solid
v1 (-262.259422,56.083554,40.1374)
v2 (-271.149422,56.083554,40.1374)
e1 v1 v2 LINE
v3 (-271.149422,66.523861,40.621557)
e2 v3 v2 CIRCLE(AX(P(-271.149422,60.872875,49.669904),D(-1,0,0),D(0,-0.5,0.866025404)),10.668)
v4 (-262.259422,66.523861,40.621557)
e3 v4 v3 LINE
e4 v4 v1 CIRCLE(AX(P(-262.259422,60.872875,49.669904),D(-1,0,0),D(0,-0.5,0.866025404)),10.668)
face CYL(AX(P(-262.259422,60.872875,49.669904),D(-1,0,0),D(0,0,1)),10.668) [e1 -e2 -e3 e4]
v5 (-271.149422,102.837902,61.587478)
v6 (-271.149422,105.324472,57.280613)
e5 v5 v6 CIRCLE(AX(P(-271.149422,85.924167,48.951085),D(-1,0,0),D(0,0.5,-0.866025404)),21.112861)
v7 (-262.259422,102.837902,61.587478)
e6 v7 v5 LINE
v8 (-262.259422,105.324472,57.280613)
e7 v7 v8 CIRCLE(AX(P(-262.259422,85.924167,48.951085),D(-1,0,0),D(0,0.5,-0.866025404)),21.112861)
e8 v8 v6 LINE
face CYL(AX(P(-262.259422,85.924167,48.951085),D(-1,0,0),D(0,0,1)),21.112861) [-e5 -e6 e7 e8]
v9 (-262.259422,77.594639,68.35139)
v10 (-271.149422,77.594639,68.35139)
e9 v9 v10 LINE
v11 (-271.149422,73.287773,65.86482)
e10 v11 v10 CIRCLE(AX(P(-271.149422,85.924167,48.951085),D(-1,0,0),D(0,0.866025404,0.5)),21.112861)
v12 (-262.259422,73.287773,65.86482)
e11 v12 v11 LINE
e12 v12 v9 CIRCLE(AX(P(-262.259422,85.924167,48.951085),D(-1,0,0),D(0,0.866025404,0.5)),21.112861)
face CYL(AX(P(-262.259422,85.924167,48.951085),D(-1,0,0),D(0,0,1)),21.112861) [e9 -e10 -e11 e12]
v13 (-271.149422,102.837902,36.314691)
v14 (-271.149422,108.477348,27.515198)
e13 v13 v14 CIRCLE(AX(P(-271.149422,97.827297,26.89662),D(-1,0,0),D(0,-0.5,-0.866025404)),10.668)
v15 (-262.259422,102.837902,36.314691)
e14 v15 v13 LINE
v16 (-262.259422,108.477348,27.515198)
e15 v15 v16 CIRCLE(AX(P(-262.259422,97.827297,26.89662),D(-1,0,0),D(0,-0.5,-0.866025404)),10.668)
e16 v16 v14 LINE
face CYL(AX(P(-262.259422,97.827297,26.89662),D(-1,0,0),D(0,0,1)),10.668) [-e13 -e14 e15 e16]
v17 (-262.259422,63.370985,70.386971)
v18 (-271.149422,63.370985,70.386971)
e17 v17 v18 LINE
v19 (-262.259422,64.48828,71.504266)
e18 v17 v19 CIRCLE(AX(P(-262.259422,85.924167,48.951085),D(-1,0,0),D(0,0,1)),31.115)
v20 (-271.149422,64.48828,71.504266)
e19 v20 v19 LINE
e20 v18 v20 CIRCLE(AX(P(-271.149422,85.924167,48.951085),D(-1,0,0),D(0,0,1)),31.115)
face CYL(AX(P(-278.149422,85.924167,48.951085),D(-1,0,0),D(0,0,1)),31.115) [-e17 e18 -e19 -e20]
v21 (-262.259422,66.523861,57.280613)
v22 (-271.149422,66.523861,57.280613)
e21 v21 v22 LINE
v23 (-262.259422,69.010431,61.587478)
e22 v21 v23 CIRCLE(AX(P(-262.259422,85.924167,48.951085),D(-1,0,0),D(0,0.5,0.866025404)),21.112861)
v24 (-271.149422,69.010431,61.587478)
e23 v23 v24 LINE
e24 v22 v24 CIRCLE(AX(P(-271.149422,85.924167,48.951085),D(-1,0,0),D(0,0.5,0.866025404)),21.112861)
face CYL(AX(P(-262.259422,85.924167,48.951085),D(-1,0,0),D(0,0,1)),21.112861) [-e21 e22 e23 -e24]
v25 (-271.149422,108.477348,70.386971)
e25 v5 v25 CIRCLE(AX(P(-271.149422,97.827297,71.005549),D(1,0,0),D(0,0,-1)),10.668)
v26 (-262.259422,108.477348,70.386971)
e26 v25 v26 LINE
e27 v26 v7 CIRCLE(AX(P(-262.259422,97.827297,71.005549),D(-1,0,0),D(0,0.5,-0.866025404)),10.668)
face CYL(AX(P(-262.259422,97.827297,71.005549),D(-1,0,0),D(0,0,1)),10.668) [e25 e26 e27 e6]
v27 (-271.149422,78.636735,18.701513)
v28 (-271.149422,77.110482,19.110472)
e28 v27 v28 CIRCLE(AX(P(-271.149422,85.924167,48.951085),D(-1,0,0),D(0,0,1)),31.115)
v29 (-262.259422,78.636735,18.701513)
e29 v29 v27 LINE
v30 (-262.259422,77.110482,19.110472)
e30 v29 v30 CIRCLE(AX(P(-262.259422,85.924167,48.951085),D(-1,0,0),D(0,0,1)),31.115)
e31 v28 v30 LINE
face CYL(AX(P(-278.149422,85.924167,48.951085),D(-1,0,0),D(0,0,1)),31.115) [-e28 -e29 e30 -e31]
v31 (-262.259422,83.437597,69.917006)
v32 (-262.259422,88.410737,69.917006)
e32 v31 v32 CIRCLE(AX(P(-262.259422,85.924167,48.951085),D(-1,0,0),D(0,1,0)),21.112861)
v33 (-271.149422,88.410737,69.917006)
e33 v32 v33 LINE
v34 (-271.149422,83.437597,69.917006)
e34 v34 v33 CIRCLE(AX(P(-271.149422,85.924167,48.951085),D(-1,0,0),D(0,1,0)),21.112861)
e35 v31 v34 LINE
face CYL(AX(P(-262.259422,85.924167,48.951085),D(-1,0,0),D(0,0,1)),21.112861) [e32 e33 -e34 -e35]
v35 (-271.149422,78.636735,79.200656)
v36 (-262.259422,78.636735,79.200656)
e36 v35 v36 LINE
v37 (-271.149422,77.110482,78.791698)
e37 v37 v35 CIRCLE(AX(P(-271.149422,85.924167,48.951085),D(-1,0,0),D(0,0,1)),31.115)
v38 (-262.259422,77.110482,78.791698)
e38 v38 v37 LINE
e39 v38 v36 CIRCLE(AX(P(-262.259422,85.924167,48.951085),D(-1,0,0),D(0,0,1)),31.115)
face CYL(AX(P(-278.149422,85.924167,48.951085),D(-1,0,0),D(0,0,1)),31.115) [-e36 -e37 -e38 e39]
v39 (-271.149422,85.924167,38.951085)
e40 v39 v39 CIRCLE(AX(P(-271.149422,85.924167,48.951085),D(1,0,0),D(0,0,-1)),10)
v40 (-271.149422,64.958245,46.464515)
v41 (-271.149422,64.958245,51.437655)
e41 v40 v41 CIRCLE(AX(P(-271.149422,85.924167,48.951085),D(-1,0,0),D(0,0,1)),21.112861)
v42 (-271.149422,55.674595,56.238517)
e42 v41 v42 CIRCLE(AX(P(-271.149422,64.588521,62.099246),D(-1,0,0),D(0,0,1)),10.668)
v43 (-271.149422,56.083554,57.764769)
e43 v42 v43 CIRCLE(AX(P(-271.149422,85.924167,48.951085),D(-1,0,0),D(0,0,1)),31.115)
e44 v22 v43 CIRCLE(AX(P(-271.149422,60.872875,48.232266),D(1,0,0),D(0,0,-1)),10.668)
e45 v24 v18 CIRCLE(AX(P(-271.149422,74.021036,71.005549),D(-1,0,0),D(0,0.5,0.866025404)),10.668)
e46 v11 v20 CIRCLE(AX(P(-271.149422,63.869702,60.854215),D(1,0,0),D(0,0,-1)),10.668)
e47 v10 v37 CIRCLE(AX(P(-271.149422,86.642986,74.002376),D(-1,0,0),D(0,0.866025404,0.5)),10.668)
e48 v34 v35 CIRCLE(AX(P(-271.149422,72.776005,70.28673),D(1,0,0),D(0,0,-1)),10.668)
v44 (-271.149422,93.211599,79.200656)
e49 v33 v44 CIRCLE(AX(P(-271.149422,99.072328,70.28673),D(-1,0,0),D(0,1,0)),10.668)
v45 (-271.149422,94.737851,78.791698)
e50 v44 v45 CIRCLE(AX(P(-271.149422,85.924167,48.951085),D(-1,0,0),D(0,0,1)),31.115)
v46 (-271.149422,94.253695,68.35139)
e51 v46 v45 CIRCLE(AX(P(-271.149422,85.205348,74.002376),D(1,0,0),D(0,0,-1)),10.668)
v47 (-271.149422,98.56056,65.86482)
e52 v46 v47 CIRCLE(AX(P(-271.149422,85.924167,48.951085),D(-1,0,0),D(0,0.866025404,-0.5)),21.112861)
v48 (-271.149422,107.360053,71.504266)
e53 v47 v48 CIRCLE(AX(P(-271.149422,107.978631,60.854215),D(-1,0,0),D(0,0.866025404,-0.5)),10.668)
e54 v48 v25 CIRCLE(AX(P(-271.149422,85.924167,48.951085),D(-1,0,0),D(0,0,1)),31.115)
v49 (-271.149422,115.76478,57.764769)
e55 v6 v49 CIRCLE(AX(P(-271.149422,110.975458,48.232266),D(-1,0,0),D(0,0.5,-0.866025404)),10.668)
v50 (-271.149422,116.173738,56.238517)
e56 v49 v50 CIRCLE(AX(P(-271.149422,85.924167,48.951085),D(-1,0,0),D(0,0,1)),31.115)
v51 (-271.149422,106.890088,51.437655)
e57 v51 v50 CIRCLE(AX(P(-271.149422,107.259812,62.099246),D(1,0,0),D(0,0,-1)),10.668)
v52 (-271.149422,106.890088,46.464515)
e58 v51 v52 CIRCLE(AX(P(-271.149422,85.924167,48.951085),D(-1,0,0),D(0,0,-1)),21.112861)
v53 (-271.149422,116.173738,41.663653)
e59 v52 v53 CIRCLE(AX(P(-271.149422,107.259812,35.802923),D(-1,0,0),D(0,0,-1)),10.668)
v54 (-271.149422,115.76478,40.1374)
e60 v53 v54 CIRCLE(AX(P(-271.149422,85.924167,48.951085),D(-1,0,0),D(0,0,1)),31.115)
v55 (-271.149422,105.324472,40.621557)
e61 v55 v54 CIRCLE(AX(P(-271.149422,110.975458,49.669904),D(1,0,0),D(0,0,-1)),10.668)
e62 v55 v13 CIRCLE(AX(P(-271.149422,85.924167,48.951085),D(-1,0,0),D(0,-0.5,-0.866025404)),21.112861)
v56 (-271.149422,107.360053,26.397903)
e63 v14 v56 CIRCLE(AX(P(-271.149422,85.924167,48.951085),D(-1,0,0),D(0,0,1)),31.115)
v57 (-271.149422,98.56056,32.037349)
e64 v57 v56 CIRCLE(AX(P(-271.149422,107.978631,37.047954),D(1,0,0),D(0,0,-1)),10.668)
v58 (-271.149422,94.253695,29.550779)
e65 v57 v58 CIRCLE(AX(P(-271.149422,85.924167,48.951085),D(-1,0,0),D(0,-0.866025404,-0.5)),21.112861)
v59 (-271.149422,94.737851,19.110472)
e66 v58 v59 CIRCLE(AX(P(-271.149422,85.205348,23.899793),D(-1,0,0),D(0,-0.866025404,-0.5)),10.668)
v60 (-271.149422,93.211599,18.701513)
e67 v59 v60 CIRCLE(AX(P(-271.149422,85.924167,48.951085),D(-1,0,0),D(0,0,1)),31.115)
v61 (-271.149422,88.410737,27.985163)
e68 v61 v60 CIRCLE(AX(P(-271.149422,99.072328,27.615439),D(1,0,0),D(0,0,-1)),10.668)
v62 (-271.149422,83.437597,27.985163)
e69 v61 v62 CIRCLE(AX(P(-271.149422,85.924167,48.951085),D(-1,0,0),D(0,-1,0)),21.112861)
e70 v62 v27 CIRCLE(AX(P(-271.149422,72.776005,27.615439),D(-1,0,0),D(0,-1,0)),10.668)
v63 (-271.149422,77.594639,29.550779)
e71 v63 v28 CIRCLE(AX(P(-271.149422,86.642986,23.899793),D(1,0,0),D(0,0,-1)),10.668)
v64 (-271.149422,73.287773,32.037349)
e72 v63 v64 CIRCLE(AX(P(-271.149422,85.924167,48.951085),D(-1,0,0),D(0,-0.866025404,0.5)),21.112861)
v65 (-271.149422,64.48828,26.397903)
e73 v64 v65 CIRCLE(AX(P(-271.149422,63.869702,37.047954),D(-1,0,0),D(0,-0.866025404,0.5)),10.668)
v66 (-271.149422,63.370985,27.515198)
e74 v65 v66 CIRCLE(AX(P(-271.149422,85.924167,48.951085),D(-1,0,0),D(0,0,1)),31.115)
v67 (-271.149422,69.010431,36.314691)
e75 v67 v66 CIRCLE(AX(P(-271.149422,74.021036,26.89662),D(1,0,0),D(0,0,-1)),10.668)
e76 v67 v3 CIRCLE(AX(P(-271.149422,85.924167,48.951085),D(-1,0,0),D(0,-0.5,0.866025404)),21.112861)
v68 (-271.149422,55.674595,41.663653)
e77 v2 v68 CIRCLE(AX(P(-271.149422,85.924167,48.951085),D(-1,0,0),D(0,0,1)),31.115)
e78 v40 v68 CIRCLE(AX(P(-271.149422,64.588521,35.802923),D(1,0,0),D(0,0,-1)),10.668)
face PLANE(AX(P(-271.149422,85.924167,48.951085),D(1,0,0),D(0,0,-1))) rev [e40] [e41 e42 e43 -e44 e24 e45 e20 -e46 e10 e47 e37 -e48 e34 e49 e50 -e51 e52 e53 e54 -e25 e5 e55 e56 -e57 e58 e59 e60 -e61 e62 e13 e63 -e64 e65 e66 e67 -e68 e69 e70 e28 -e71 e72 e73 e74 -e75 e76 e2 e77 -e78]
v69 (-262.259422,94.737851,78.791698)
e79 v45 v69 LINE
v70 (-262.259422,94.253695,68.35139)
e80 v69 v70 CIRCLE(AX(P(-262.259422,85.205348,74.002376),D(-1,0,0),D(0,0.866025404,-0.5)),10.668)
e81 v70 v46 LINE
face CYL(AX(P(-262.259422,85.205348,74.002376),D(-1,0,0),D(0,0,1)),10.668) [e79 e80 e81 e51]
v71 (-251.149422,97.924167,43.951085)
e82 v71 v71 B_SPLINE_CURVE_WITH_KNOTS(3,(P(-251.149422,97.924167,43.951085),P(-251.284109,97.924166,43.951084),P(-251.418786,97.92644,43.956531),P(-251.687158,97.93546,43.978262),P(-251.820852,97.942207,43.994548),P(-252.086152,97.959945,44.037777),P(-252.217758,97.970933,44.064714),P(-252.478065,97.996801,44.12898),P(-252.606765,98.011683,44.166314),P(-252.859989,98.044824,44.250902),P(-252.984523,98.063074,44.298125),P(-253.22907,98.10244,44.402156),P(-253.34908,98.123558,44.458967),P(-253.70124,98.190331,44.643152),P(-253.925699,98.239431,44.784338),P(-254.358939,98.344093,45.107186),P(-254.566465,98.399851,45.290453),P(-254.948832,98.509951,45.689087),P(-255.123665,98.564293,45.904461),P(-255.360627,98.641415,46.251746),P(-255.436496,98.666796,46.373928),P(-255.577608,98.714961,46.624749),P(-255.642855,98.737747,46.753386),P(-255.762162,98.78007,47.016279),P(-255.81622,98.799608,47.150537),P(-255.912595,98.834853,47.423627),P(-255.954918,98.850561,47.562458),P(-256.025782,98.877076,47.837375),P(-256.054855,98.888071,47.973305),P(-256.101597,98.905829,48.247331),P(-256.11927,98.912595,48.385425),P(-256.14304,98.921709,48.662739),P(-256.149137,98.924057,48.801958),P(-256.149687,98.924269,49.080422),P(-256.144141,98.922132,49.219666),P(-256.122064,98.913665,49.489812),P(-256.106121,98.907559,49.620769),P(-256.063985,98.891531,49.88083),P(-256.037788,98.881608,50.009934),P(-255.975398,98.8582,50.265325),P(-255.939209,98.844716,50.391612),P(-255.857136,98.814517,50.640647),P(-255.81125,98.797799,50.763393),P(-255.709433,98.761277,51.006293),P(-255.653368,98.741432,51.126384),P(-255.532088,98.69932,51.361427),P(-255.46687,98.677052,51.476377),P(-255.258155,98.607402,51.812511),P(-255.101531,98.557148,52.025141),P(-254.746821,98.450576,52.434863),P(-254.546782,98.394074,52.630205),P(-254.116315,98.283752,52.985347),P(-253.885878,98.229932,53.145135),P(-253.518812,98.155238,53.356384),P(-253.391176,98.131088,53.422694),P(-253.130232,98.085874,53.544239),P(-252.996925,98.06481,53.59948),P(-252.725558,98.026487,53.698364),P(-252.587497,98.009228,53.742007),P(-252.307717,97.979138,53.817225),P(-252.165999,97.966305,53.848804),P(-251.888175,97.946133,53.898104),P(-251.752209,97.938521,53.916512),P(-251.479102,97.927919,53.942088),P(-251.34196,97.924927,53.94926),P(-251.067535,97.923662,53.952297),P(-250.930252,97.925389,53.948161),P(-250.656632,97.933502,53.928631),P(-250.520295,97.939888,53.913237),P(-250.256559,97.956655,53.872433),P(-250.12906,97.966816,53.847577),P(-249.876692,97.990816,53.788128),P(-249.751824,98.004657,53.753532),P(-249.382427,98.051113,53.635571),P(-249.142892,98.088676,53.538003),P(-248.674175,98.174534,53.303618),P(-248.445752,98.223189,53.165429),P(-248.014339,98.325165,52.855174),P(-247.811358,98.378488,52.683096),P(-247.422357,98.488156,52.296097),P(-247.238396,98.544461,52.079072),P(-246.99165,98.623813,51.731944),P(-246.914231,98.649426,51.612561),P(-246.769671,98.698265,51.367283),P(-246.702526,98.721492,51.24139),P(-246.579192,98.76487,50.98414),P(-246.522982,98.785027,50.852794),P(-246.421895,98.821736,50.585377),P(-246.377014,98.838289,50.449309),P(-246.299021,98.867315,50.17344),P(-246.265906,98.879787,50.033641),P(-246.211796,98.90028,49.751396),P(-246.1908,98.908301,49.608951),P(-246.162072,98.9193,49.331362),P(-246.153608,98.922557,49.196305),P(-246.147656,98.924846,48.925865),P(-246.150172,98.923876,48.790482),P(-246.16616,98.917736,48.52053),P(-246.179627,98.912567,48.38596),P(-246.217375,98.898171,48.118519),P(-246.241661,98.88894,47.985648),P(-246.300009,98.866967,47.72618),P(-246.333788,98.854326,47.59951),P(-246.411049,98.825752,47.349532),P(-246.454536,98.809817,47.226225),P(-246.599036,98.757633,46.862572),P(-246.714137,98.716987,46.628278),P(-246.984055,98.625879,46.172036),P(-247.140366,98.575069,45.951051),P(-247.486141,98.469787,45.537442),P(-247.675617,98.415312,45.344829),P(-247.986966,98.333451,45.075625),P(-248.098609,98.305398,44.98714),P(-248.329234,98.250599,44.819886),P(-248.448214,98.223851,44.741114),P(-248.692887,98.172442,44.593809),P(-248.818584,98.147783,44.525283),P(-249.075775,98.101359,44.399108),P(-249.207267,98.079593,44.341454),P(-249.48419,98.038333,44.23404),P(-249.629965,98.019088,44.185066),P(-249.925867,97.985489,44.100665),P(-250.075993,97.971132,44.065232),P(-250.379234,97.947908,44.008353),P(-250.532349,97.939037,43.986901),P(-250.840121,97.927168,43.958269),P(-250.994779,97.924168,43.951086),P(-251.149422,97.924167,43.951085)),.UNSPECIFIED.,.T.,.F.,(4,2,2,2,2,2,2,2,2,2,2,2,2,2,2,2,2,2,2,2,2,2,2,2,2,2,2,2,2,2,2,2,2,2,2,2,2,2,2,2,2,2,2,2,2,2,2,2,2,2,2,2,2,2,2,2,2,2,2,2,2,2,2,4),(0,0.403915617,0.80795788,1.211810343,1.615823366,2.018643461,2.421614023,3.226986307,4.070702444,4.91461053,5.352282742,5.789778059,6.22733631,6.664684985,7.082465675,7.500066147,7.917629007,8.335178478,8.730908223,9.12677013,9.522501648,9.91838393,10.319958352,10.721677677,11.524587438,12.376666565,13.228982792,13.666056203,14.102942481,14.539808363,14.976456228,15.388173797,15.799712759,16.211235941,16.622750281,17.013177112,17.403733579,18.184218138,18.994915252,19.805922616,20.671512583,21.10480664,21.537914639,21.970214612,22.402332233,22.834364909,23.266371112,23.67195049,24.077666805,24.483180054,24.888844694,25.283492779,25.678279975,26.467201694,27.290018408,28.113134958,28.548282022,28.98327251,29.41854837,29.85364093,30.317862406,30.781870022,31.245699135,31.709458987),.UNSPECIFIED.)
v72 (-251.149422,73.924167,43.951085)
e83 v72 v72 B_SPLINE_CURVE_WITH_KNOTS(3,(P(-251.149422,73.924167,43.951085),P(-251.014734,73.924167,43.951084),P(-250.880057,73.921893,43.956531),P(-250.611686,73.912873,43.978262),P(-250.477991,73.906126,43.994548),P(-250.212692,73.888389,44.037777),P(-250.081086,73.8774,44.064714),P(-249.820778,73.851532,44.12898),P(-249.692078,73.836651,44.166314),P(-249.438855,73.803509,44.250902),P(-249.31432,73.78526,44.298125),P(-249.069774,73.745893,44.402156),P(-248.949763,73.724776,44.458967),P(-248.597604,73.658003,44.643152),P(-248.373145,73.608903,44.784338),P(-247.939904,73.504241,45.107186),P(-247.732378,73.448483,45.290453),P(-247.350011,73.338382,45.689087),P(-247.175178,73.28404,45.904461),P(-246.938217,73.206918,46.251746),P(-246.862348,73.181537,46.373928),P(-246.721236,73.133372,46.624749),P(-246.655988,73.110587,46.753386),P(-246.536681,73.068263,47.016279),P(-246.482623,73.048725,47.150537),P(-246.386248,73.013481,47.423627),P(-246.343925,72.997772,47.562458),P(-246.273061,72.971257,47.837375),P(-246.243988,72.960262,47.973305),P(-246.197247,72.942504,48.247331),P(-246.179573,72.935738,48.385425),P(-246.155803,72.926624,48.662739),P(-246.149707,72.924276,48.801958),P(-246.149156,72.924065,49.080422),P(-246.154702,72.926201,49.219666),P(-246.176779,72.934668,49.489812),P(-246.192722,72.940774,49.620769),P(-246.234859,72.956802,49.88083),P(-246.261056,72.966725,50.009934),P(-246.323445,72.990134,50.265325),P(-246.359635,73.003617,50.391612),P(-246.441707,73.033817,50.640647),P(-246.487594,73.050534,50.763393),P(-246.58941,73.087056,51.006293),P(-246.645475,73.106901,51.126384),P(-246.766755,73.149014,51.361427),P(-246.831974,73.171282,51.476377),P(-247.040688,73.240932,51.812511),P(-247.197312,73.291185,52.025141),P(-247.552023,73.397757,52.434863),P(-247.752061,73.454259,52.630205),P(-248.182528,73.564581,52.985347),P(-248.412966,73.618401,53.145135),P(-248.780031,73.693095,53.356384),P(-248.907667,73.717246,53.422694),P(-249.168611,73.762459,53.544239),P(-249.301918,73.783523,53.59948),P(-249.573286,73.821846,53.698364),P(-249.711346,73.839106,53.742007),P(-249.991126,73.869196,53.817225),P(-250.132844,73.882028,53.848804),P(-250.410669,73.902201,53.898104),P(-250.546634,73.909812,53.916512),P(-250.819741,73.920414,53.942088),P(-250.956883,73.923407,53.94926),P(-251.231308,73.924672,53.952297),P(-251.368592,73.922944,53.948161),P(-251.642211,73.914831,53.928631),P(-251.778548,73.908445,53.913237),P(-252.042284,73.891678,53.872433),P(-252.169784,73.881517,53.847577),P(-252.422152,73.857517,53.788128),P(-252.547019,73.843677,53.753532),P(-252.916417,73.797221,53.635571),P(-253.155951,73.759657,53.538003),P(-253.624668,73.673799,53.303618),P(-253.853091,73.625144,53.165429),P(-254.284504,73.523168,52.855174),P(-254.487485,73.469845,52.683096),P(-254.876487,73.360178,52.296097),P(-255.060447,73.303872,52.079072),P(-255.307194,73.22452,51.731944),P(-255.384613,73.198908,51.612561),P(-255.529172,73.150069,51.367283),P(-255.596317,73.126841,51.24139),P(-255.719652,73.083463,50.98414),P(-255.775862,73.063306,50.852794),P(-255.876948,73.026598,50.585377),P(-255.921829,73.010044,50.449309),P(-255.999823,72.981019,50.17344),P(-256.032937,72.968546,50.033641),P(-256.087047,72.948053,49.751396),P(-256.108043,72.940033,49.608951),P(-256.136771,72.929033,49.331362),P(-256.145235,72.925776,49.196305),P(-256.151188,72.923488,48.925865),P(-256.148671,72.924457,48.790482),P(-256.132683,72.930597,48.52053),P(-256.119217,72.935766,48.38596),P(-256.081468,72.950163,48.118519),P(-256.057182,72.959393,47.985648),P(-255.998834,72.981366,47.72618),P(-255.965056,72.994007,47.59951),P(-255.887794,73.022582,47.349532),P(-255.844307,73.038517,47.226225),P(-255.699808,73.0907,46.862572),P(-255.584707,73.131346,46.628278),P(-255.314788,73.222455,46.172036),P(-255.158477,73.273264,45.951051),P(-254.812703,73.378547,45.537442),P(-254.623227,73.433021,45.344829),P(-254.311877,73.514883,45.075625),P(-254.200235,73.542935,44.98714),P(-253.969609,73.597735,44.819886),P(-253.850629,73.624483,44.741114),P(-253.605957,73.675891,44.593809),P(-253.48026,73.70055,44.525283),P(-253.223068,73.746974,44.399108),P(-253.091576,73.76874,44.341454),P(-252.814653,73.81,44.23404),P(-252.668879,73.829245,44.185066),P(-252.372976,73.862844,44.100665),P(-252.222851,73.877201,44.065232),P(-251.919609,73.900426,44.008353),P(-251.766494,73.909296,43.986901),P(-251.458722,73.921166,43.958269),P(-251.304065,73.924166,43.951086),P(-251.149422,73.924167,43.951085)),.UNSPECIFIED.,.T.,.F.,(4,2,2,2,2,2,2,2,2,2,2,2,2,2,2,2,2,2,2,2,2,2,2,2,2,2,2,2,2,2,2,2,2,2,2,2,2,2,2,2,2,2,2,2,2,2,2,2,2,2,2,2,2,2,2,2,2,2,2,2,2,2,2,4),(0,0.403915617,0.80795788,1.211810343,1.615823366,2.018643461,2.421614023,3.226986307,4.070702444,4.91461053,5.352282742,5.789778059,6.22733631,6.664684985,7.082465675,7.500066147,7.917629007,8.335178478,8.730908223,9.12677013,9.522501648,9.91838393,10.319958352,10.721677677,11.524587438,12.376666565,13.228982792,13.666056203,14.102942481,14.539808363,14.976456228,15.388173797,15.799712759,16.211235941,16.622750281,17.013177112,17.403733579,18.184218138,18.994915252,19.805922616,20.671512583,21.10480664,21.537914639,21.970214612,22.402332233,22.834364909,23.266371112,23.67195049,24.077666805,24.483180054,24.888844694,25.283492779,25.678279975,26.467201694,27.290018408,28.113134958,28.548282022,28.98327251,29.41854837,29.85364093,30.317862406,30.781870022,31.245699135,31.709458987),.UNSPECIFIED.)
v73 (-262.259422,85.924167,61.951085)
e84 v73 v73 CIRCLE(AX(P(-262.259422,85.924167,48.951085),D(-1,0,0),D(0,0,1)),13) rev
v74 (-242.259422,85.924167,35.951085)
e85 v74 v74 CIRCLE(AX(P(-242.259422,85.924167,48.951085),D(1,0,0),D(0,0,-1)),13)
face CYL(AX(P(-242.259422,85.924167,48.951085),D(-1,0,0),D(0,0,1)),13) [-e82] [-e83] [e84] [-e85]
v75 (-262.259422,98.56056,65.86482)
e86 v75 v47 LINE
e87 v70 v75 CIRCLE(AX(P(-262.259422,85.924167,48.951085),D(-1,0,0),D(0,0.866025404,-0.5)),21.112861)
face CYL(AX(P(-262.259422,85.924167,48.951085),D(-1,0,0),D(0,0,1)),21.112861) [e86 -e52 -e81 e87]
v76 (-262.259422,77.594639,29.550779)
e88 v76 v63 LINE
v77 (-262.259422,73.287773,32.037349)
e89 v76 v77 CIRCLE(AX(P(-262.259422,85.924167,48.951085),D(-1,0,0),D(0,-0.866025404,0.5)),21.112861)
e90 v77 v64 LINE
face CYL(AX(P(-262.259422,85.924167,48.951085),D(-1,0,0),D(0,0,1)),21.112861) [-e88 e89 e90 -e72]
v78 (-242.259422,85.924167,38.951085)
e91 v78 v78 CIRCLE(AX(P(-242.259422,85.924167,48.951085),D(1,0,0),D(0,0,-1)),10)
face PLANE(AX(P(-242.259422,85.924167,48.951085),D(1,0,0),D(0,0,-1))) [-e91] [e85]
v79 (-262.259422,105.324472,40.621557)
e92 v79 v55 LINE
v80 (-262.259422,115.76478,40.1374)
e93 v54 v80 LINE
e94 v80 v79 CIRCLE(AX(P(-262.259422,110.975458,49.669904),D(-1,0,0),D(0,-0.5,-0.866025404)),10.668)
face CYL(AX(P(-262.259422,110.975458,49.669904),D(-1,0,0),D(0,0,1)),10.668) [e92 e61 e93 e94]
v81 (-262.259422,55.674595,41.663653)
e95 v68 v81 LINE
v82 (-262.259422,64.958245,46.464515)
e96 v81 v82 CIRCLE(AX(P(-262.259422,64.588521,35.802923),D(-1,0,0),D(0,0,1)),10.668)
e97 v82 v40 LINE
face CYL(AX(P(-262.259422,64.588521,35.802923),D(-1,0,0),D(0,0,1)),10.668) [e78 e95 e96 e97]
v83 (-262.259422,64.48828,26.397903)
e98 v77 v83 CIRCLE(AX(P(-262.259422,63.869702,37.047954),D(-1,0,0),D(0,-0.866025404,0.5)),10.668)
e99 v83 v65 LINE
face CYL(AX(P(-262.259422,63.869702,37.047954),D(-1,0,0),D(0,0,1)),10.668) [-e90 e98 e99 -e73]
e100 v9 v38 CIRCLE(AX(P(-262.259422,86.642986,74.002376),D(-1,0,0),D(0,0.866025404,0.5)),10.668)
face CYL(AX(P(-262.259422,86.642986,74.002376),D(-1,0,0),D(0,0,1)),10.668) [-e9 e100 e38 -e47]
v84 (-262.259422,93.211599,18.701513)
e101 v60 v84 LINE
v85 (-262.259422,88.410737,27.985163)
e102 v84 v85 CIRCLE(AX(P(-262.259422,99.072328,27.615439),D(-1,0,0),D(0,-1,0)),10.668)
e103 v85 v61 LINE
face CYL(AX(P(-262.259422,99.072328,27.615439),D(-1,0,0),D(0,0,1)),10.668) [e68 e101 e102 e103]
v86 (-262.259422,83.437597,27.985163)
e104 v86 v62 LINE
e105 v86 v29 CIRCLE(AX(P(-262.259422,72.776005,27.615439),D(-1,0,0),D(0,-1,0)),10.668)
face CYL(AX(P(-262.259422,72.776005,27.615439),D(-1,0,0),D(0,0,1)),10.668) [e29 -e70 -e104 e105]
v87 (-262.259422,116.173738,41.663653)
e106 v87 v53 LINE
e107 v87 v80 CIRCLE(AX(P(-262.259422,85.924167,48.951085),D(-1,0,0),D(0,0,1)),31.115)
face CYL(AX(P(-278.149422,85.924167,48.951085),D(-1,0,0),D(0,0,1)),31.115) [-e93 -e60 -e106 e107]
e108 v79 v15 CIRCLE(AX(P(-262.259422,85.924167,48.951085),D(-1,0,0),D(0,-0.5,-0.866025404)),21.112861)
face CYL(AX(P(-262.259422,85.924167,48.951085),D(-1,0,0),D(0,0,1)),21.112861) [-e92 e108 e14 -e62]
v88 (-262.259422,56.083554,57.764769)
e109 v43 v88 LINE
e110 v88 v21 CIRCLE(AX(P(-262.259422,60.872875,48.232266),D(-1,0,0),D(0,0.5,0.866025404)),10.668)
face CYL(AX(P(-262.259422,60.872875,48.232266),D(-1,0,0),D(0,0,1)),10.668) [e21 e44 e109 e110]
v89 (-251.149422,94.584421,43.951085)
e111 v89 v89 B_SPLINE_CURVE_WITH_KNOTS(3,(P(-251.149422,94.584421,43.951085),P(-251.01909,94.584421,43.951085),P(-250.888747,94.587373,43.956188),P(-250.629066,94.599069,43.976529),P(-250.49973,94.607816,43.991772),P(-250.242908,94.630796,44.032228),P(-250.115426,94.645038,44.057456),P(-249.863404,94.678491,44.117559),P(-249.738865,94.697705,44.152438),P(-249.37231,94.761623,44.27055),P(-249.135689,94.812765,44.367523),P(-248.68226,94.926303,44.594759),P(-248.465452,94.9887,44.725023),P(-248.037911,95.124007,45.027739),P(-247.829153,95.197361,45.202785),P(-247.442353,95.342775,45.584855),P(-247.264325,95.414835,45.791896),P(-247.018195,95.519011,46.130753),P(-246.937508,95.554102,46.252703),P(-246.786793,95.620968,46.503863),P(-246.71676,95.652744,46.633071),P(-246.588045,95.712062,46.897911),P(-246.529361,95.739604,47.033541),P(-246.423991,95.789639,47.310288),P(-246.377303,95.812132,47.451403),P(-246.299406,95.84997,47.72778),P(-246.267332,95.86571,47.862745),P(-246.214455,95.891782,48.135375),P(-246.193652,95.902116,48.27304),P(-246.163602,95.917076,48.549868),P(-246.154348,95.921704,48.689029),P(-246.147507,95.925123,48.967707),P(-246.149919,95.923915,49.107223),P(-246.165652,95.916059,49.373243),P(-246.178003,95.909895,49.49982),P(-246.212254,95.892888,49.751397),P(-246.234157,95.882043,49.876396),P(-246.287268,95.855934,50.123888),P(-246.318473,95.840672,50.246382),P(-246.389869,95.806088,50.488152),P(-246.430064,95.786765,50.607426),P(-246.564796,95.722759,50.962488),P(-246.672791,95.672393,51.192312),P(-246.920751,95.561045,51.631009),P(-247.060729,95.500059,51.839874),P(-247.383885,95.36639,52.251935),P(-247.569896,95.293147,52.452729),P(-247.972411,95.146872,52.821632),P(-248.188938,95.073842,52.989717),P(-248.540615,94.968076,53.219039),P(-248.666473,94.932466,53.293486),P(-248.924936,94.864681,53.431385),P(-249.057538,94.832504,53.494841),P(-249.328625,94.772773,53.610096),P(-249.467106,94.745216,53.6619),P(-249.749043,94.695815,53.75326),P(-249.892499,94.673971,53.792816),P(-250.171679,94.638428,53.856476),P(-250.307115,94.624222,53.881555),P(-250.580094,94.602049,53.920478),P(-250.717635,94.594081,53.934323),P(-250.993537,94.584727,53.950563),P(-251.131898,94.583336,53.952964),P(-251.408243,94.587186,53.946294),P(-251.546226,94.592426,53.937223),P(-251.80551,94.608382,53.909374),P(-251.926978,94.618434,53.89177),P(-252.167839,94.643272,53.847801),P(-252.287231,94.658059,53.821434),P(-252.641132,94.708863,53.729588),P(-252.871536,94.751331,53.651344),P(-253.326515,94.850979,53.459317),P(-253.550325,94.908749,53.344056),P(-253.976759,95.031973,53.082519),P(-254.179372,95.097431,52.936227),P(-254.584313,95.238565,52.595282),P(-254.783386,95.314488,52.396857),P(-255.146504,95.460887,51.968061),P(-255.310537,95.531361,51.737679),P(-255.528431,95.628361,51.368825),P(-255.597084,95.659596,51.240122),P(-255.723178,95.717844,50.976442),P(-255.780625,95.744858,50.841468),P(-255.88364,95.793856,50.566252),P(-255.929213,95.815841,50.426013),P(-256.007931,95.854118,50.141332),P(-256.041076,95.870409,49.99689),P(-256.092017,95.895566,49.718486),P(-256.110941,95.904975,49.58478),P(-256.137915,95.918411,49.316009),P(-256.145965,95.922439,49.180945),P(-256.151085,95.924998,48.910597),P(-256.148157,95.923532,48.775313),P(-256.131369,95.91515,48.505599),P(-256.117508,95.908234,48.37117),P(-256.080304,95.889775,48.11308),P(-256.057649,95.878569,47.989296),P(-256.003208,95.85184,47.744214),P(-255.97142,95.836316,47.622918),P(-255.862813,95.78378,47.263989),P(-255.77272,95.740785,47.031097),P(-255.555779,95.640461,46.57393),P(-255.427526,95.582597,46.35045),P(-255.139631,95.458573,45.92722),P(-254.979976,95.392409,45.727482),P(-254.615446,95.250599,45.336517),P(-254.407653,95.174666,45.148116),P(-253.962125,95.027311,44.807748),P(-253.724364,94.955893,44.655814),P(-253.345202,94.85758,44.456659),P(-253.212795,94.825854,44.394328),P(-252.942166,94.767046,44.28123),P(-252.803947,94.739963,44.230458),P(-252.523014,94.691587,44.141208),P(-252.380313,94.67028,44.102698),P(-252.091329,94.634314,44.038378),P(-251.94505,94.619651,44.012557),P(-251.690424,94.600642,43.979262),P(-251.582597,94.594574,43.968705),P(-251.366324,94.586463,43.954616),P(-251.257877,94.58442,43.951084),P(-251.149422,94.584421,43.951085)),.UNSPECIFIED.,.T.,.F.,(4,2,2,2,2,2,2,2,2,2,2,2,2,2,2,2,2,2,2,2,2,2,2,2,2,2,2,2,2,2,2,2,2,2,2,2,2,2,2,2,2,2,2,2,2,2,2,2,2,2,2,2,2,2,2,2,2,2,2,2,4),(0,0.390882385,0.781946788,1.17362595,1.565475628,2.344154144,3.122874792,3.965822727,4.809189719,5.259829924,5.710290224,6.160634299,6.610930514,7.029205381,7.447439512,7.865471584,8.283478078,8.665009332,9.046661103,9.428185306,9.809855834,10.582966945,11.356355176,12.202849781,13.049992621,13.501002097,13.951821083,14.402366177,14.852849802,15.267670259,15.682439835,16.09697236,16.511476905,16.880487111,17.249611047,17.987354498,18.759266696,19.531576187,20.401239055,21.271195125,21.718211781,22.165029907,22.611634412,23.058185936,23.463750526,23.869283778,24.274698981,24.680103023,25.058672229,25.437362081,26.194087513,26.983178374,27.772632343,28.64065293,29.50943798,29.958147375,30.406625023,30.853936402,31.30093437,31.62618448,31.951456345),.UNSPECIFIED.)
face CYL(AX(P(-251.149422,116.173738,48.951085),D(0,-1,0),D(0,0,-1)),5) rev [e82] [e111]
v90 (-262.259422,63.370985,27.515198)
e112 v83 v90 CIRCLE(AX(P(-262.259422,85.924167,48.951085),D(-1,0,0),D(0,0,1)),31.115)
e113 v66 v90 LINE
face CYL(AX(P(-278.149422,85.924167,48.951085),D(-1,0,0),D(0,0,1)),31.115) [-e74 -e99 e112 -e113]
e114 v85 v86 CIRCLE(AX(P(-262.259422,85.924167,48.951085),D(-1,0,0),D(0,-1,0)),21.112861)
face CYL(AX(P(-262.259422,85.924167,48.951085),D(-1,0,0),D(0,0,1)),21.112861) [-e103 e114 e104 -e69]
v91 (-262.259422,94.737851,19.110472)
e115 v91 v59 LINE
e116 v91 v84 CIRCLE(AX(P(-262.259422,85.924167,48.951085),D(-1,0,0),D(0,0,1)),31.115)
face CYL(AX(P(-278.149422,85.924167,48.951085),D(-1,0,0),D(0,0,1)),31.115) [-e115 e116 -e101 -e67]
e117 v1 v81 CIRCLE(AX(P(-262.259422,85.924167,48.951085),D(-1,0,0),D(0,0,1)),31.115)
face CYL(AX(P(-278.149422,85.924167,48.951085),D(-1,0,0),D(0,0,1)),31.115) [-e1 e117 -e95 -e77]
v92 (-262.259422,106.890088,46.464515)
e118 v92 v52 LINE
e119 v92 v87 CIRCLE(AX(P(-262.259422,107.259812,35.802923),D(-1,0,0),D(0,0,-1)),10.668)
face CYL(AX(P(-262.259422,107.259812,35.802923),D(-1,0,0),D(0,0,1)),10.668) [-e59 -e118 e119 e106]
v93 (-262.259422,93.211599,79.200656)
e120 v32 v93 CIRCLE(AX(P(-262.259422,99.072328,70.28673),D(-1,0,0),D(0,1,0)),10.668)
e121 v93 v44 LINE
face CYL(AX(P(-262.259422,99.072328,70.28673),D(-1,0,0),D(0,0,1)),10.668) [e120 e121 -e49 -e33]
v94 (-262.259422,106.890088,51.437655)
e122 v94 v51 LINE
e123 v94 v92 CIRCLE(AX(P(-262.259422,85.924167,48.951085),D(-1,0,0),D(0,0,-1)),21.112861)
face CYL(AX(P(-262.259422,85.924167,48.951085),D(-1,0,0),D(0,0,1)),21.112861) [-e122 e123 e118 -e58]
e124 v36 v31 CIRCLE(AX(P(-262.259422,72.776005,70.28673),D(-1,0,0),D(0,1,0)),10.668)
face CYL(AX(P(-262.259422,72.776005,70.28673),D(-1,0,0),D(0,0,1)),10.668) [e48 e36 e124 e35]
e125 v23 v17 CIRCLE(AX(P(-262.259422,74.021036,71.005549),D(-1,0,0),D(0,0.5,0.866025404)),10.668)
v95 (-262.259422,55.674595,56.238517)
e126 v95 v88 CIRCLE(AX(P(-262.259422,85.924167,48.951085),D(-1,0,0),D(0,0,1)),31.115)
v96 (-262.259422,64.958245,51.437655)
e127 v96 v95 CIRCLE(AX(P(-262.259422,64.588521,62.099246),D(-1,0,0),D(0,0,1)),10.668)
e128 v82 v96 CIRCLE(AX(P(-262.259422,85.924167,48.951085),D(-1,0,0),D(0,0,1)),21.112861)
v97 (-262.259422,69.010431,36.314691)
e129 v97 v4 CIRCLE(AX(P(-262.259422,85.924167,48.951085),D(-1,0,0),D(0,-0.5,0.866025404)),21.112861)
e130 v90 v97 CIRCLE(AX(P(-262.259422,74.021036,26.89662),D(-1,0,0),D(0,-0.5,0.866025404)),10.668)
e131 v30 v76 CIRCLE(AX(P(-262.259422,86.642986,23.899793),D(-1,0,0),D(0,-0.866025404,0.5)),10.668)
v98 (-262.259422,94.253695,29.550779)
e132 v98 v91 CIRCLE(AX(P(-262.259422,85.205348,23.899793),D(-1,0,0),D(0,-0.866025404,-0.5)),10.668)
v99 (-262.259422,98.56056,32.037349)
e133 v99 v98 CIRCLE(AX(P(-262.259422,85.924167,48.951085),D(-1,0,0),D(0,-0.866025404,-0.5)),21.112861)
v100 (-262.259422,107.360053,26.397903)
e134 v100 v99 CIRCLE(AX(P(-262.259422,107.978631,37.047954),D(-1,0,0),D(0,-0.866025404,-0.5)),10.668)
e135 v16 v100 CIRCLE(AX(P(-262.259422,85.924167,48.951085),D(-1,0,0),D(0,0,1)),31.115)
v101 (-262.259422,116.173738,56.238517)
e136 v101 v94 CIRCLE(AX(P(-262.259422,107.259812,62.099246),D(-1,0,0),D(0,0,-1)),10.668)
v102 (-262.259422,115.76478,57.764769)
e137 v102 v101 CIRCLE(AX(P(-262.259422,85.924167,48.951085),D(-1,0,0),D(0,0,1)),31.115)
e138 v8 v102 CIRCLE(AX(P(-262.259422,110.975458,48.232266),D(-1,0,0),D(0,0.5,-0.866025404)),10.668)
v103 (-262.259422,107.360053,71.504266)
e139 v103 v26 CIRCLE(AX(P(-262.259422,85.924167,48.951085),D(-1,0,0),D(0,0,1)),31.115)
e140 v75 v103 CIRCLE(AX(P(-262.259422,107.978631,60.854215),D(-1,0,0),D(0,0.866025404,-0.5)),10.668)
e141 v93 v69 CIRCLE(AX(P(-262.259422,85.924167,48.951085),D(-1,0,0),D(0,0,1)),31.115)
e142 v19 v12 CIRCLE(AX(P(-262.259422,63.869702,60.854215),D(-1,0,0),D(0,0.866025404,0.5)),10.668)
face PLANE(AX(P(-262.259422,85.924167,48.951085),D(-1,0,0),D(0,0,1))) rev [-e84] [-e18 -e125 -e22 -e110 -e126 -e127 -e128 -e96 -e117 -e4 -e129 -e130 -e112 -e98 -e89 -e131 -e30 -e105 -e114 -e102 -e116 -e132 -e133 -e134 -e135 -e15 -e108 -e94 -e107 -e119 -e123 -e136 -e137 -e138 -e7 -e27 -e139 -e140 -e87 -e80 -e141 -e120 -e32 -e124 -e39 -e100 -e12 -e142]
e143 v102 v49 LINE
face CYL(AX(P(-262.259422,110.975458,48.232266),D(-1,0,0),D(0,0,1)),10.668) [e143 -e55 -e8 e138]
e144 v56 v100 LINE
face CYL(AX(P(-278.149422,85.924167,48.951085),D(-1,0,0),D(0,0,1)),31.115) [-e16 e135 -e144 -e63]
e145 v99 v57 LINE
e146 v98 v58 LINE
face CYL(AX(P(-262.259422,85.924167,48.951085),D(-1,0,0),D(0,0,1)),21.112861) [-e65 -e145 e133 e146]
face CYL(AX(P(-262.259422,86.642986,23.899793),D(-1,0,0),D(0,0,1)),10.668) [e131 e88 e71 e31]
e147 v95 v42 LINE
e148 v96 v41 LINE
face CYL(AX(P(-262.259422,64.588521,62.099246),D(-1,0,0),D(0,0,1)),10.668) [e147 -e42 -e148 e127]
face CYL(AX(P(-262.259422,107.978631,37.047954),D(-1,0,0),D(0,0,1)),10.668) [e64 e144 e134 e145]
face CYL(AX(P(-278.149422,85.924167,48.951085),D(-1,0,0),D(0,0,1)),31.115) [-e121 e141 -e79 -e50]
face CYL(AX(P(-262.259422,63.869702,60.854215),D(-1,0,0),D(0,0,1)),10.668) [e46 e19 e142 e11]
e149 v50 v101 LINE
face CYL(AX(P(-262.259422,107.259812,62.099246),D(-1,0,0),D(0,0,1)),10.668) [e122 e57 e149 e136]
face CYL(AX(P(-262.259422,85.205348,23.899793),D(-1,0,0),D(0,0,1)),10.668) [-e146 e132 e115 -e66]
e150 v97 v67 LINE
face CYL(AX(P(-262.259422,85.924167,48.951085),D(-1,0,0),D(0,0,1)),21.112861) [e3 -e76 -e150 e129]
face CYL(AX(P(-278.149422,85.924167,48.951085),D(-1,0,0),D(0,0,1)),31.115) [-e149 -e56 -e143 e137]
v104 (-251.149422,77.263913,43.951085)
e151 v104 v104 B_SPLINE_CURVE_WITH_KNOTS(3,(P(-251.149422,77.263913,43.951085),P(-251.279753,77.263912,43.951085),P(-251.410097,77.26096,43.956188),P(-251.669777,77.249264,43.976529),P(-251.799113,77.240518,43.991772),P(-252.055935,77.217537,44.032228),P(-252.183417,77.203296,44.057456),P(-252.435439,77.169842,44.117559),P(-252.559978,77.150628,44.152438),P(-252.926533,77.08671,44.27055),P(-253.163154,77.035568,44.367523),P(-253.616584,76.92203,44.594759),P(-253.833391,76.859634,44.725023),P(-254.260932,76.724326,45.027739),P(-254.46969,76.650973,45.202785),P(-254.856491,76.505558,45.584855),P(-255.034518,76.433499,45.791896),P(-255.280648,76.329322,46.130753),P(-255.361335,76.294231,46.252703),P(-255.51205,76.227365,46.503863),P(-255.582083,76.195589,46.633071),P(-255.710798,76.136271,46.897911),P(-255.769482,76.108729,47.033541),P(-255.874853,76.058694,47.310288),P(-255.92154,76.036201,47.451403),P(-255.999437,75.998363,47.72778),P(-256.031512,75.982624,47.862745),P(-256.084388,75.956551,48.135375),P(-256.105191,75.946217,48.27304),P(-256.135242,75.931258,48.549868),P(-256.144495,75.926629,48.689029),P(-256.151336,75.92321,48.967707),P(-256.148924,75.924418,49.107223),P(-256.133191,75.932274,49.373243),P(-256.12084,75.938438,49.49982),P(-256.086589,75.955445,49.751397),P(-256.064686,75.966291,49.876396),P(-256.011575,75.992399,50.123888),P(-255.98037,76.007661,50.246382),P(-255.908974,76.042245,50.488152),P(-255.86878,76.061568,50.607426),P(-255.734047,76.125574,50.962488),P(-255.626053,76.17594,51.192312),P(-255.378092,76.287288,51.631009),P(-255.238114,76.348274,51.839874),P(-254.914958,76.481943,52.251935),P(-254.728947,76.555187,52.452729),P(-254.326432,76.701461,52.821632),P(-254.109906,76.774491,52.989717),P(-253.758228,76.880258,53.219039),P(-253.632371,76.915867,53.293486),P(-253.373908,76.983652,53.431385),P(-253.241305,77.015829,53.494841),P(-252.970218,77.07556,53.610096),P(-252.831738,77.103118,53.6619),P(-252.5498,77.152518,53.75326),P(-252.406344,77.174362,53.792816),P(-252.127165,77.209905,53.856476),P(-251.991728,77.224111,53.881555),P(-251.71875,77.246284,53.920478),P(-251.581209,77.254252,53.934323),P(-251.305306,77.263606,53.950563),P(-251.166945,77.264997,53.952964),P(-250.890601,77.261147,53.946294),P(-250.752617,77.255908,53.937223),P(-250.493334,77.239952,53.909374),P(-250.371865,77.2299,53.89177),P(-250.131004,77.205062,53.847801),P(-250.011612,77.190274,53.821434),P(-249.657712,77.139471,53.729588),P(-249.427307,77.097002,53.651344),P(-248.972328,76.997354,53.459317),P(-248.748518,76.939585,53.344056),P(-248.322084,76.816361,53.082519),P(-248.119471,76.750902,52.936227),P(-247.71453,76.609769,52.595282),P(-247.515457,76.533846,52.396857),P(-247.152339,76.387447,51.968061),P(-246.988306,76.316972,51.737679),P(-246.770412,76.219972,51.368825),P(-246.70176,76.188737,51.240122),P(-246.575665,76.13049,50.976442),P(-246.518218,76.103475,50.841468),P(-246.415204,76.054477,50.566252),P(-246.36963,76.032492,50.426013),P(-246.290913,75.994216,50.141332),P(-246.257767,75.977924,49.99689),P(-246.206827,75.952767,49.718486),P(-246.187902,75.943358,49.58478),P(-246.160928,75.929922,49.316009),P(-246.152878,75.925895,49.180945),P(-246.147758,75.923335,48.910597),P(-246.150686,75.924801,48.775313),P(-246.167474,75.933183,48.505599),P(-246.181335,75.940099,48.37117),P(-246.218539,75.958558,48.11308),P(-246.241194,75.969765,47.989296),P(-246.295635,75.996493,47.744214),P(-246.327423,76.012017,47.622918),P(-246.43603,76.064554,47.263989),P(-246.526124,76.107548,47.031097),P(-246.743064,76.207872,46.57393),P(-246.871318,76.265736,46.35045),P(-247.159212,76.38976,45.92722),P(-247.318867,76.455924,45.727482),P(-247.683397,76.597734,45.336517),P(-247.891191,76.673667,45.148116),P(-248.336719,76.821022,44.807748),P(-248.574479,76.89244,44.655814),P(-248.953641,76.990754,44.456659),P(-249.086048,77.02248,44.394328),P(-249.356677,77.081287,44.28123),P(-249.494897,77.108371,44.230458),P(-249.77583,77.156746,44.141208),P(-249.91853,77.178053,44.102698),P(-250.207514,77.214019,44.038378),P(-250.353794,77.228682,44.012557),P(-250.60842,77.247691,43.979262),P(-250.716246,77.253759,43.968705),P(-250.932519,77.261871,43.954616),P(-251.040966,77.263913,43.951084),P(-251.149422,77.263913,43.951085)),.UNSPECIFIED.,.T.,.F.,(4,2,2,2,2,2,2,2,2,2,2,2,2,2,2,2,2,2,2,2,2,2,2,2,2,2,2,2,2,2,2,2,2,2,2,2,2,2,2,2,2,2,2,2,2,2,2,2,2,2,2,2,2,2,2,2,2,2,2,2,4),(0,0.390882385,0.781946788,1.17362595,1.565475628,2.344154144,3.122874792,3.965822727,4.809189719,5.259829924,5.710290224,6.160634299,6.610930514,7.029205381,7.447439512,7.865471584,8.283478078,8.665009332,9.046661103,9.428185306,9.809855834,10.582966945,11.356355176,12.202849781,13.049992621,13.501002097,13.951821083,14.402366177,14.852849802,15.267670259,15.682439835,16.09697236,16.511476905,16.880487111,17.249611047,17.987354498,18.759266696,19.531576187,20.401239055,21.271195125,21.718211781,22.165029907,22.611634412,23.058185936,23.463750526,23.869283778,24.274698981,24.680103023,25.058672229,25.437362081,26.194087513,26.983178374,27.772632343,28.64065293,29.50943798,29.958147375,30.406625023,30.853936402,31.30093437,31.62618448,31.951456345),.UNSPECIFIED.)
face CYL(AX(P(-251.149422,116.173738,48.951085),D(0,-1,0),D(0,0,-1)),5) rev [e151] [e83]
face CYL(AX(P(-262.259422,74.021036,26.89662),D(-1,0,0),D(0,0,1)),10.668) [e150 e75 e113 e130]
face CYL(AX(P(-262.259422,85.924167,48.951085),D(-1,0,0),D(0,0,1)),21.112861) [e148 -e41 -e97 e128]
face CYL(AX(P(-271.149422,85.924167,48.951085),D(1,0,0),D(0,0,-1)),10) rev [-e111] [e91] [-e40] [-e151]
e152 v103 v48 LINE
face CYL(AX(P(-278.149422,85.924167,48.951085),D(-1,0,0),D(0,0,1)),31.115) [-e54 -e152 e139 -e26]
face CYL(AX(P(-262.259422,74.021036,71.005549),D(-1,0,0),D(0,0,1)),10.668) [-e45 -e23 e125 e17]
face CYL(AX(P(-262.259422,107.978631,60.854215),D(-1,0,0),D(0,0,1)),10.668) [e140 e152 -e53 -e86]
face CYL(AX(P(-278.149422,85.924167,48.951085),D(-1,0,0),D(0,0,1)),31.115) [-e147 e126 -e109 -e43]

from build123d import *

# Parameters (mm, degrees)
SPUR_START             = -273.054421635
SPUR_GEAR_AM_OUTLINE_R = 9.525
SPUR_GEAR_AM_DEPTH     = 12.7
SCALE2_SCALE           = 0.7
SKETCH5_R              = 10
CUT_EXTRUDE2_DEPTH     = 141.883332495
BOSS_EXTRUDE1_START    = 20
SKETCH7_R              = 13
SKETCH7_R_2            = 10
BOSS_EXTRUDE1_DEPTH    = 20
SKETCH8_R              = 5
CUT_EXTRUDE3_DEPTH     = 306.435901832


# Read off the part's stored shape, not the designer's step: spur gear_am
with BuildPart() as part:
    # spur gear_am outline → spur gear_am (new body)
    with BuildSketch(Plane.YZ.offset(SPUR_START)):
        with BuildLine():
            ThreePointArc((116.546862005, 16.732254346), (117.355063047, 17.520188248), (118.142996949, 18.32838929))
            ThreePointArc((118.142996949, 18.32838929), (115.759708054, 25.667921311), (110.086646287, 30.899093879))
            ThreePointArc((110.086646287, 30.899093879), (112.044558013, 33.870469671), (113.638889071, 37.05175886))
            ThreePointArc((113.638889071, 37.05175886), (121.00574829, 34.754329537), (128.553613919, 36.360106821))
            ThreePointArc((128.553613919, 36.360106821), (128.859569602, 37.446578117), (129.137839856, 38.540467701))
            ThreePointArc((129.137839856, 38.540467701), (123.404085119, 43.705044437), (115.875483227, 45.398841888))
            ThreePointArc((115.875483227, 45.398841888), (116.085396623, 48.951084671), (115.875483227, 52.503327455))
            ThreePointArc((115.875483227, 52.503327455), (123.404085118, 54.197124907), (129.137839856, 59.361701642))
            ThreePointArc((129.137839856, 59.361701642), (128.859569602, 60.455591227), (128.553613919, 61.542062523))
            ThreePointArc((128.553613919, 61.542062523), (121.00574829, 63.147839807), (113.638889071, 60.850410483))
            ThreePointArc((113.638889071, 60.850410483), (112.044558013, 64.031699672), (110.086646287, 67.003075464))
            ThreePointArc((110.086646287, 67.003075464), (115.759708054, 72.234248032), (118.142996949, 79.573780054))
            ThreePointArc((118.142996949, 79.573780054), (117.355063047, 80.381981095), (116.546862005, 81.169914997))
            ThreePointArc((116.546862005, 81.169914997), (109.207329984, 78.786626103), (103.976157416, 73.113564336))
            ThreePointArc((103.976157416, 73.113564336), (101.004781623, 75.071476061), (97.823492434, 76.665807119))
            ThreePointArc((97.823492434, 76.665807119), (100.120921758, 84.032666338), (98.515144474, 91.580531968))
            ThreePointArc((98.515144474, 91.580531968), (97.428673178, 91.88648765), (96.334783594, 92.164757905))
            ThreePointArc((96.334783594, 92.164757905), (91.170206858, 86.431003167), (89.476409406, 78.902401276))
            ThreePointArc((89.476409406, 78.902401276), (85.924166623, 79.112314672), (82.37192384, 78.902401276))
            ThreePointArc((82.37192384, 78.902401276), (80.678126388, 86.431003167), (75.513549653, 92.164757905))
            ThreePointArc((75.513549653, 92.164757905), (74.419660069, 91.88648765), (73.333188772, 91.580531968))
            ThreePointArc((73.333188772, 91.580531968), (71.727411488, 84.032666338), (74.024840812, 76.665807119))
            ThreePointArc((74.024840812, 76.665807119), (70.843551623, 75.071476061), (67.87217583, 73.113564336))
            ThreePointArc((67.87217583, 73.113564336), (62.641003263, 78.786626103), (55.301471241, 81.169914997))
            ThreePointArc((55.301471241, 81.169914997), (54.493270199, 80.381981096), (53.705336298, 79.573780054))
            ThreePointArc((53.705336298, 79.573780054), (56.088625192, 72.234248032), (61.761686959, 67.003075464))
            ThreePointArc((61.761686959, 67.003075464), (59.803775234, 64.031699671), (58.209444175, 60.850410483))
            ThreePointArc((58.209444175, 60.850410483), (50.842584956, 63.147839807), (43.294719327, 61.542062523))
            ThreePointArc((43.294719327, 61.542062523), (42.988763645, 60.455591226), (42.71049339, 59.361701642))
            ThreePointArc((42.71049339, 59.361701642), (48.444248128, 54.197124907), (55.972850019, 52.503327455))
            ThreePointArc((55.972850019, 52.503327455), (55.762936623, 48.951084671), (55.972850019, 45.398841888))
            ThreePointArc((55.972850019, 45.398841888), (48.444248127, 43.705044437), (42.71049339, 38.540467701))
            ThreePointArc((42.71049339, 38.540467701), (42.988763645, 37.446578117), (43.294719327, 36.360106821))
            ThreePointArc((43.294719327, 36.360106821), (50.842584956, 34.754329537), (58.209444175, 37.05175886))
            ThreePointArc((58.209444175, 37.05175886), (59.803775234, 33.870469672), (61.761686959, 30.899093879))
            ThreePointArc((61.761686959, 30.899093879), (56.088625192, 25.667921311), (53.705336298, 18.32838929))
            ThreePointArc((53.705336298, 18.32838929), (54.493270199, 17.520188248), (55.301471241, 16.732254346))
            ThreePointArc((55.301471241, 16.732254346), (62.641003263, 19.11554324), (67.87217583, 24.788605007))
            ThreePointArc((67.87217583, 24.788605007), (70.843551623, 22.830693282), (74.024840812, 21.236362224))
            ThreePointArc((74.024840812, 21.236362224), (71.727411488, 13.869503005), (73.333188772, 6.321637376))
            ThreePointArc((73.333188772, 6.321637376), (74.419660068, 6.015681693), (75.513549653, 5.737411439))
            ThreePointArc((75.513549653, 5.737411439), (80.678126388, 11.471166177), (82.37192384, 18.999768068))
            ThreePointArc((82.37192384, 18.999768068), (85.924166623, 18.789854672), (89.476409406, 18.999768068))
            ThreePointArc((89.476409406, 18.999768068), (91.170206858, 11.471166176), (96.334783594, 5.737411439))
            ThreePointArc((96.334783594, 5.737411439), (97.428673178, 6.015681693), (98.515144474, 6.321637376))
            ThreePointArc((98.515144474, 6.321637376), (100.120921758, 13.869503005), (97.823492434, 21.236362224))
            ThreePointArc((97.823492434, 21.236362224), (101.004781623, 22.830693282), (103.976157416, 24.788605007))
            ThreePointArc((103.976157416, 24.788605007), (109.207329984, 19.11554324), (116.546862005, 16.732254346))
        make_face()
        with Locations((85.924166623, 48.951084672)):
            Circle(SPUR_GEAR_AM_OUTLINE_R, mode=Mode.SUBTRACT)
    extrude(amount=SPUR_GEAR_AM_DEPTH)


with BuildPart() as part_1:
    # Scale2: scaled about (-266.704421635, 85.924166623, 48.951084672)
    add(part.part.scale(SCALE2_SCALE).moved(Location((-80.011326491, 25.777249987, 14.685325402))))

    # Sketch5 → Cut-Extrude2 (cut, through all)
    with BuildSketch(Plane(origin=(-262.259421635, 0, 0), x_dir=(0, 0, -1), z_dir=(1, 0, 0))):
        with Locations((-48.951084672, 85.924166623)):
            Circle(SKETCH5_R)
    extrude(amount=-CUT_EXTRUDE2_DEPTH, mode=Mode.SUBTRACT)

    # Sketch7 → Boss-Extrude1 (add)
    with BuildSketch(Plane(origin=(-262.259421635, 0, 0), x_dir=(0, 0, -1), z_dir=(1, 0, 0)).offset(BOSS_EXTRUDE1_START)):
        with Locations(Location((-48.951084672, 85.924166623, 0), (0, 0, 180))):
            Circle(SKETCH7_R)
        with Locations((-48.951084672, 85.924166623)):
            Circle(SKETCH7_R_2, mode=Mode.SUBTRACT)
    extrude(amount=-BOSS_EXTRUDE1_DEPTH)

    # Sketch8 → Cut-Extrude3 (cut, through all)
    with BuildSketch(Plane(origin=(0, 0, 0), x_dir=(1, 0, 0), z_dir=(0, 1, 0))):
        with Locations(Location((-251.149421635, -48.951084672, 0), (0, 0, 90))):
            Circle(SKETCH8_R)
    extrude(amount=CUT_EXTRUDE3_DEPTH, mode=Mode.SUBTRACT)


solid = part_1.part
